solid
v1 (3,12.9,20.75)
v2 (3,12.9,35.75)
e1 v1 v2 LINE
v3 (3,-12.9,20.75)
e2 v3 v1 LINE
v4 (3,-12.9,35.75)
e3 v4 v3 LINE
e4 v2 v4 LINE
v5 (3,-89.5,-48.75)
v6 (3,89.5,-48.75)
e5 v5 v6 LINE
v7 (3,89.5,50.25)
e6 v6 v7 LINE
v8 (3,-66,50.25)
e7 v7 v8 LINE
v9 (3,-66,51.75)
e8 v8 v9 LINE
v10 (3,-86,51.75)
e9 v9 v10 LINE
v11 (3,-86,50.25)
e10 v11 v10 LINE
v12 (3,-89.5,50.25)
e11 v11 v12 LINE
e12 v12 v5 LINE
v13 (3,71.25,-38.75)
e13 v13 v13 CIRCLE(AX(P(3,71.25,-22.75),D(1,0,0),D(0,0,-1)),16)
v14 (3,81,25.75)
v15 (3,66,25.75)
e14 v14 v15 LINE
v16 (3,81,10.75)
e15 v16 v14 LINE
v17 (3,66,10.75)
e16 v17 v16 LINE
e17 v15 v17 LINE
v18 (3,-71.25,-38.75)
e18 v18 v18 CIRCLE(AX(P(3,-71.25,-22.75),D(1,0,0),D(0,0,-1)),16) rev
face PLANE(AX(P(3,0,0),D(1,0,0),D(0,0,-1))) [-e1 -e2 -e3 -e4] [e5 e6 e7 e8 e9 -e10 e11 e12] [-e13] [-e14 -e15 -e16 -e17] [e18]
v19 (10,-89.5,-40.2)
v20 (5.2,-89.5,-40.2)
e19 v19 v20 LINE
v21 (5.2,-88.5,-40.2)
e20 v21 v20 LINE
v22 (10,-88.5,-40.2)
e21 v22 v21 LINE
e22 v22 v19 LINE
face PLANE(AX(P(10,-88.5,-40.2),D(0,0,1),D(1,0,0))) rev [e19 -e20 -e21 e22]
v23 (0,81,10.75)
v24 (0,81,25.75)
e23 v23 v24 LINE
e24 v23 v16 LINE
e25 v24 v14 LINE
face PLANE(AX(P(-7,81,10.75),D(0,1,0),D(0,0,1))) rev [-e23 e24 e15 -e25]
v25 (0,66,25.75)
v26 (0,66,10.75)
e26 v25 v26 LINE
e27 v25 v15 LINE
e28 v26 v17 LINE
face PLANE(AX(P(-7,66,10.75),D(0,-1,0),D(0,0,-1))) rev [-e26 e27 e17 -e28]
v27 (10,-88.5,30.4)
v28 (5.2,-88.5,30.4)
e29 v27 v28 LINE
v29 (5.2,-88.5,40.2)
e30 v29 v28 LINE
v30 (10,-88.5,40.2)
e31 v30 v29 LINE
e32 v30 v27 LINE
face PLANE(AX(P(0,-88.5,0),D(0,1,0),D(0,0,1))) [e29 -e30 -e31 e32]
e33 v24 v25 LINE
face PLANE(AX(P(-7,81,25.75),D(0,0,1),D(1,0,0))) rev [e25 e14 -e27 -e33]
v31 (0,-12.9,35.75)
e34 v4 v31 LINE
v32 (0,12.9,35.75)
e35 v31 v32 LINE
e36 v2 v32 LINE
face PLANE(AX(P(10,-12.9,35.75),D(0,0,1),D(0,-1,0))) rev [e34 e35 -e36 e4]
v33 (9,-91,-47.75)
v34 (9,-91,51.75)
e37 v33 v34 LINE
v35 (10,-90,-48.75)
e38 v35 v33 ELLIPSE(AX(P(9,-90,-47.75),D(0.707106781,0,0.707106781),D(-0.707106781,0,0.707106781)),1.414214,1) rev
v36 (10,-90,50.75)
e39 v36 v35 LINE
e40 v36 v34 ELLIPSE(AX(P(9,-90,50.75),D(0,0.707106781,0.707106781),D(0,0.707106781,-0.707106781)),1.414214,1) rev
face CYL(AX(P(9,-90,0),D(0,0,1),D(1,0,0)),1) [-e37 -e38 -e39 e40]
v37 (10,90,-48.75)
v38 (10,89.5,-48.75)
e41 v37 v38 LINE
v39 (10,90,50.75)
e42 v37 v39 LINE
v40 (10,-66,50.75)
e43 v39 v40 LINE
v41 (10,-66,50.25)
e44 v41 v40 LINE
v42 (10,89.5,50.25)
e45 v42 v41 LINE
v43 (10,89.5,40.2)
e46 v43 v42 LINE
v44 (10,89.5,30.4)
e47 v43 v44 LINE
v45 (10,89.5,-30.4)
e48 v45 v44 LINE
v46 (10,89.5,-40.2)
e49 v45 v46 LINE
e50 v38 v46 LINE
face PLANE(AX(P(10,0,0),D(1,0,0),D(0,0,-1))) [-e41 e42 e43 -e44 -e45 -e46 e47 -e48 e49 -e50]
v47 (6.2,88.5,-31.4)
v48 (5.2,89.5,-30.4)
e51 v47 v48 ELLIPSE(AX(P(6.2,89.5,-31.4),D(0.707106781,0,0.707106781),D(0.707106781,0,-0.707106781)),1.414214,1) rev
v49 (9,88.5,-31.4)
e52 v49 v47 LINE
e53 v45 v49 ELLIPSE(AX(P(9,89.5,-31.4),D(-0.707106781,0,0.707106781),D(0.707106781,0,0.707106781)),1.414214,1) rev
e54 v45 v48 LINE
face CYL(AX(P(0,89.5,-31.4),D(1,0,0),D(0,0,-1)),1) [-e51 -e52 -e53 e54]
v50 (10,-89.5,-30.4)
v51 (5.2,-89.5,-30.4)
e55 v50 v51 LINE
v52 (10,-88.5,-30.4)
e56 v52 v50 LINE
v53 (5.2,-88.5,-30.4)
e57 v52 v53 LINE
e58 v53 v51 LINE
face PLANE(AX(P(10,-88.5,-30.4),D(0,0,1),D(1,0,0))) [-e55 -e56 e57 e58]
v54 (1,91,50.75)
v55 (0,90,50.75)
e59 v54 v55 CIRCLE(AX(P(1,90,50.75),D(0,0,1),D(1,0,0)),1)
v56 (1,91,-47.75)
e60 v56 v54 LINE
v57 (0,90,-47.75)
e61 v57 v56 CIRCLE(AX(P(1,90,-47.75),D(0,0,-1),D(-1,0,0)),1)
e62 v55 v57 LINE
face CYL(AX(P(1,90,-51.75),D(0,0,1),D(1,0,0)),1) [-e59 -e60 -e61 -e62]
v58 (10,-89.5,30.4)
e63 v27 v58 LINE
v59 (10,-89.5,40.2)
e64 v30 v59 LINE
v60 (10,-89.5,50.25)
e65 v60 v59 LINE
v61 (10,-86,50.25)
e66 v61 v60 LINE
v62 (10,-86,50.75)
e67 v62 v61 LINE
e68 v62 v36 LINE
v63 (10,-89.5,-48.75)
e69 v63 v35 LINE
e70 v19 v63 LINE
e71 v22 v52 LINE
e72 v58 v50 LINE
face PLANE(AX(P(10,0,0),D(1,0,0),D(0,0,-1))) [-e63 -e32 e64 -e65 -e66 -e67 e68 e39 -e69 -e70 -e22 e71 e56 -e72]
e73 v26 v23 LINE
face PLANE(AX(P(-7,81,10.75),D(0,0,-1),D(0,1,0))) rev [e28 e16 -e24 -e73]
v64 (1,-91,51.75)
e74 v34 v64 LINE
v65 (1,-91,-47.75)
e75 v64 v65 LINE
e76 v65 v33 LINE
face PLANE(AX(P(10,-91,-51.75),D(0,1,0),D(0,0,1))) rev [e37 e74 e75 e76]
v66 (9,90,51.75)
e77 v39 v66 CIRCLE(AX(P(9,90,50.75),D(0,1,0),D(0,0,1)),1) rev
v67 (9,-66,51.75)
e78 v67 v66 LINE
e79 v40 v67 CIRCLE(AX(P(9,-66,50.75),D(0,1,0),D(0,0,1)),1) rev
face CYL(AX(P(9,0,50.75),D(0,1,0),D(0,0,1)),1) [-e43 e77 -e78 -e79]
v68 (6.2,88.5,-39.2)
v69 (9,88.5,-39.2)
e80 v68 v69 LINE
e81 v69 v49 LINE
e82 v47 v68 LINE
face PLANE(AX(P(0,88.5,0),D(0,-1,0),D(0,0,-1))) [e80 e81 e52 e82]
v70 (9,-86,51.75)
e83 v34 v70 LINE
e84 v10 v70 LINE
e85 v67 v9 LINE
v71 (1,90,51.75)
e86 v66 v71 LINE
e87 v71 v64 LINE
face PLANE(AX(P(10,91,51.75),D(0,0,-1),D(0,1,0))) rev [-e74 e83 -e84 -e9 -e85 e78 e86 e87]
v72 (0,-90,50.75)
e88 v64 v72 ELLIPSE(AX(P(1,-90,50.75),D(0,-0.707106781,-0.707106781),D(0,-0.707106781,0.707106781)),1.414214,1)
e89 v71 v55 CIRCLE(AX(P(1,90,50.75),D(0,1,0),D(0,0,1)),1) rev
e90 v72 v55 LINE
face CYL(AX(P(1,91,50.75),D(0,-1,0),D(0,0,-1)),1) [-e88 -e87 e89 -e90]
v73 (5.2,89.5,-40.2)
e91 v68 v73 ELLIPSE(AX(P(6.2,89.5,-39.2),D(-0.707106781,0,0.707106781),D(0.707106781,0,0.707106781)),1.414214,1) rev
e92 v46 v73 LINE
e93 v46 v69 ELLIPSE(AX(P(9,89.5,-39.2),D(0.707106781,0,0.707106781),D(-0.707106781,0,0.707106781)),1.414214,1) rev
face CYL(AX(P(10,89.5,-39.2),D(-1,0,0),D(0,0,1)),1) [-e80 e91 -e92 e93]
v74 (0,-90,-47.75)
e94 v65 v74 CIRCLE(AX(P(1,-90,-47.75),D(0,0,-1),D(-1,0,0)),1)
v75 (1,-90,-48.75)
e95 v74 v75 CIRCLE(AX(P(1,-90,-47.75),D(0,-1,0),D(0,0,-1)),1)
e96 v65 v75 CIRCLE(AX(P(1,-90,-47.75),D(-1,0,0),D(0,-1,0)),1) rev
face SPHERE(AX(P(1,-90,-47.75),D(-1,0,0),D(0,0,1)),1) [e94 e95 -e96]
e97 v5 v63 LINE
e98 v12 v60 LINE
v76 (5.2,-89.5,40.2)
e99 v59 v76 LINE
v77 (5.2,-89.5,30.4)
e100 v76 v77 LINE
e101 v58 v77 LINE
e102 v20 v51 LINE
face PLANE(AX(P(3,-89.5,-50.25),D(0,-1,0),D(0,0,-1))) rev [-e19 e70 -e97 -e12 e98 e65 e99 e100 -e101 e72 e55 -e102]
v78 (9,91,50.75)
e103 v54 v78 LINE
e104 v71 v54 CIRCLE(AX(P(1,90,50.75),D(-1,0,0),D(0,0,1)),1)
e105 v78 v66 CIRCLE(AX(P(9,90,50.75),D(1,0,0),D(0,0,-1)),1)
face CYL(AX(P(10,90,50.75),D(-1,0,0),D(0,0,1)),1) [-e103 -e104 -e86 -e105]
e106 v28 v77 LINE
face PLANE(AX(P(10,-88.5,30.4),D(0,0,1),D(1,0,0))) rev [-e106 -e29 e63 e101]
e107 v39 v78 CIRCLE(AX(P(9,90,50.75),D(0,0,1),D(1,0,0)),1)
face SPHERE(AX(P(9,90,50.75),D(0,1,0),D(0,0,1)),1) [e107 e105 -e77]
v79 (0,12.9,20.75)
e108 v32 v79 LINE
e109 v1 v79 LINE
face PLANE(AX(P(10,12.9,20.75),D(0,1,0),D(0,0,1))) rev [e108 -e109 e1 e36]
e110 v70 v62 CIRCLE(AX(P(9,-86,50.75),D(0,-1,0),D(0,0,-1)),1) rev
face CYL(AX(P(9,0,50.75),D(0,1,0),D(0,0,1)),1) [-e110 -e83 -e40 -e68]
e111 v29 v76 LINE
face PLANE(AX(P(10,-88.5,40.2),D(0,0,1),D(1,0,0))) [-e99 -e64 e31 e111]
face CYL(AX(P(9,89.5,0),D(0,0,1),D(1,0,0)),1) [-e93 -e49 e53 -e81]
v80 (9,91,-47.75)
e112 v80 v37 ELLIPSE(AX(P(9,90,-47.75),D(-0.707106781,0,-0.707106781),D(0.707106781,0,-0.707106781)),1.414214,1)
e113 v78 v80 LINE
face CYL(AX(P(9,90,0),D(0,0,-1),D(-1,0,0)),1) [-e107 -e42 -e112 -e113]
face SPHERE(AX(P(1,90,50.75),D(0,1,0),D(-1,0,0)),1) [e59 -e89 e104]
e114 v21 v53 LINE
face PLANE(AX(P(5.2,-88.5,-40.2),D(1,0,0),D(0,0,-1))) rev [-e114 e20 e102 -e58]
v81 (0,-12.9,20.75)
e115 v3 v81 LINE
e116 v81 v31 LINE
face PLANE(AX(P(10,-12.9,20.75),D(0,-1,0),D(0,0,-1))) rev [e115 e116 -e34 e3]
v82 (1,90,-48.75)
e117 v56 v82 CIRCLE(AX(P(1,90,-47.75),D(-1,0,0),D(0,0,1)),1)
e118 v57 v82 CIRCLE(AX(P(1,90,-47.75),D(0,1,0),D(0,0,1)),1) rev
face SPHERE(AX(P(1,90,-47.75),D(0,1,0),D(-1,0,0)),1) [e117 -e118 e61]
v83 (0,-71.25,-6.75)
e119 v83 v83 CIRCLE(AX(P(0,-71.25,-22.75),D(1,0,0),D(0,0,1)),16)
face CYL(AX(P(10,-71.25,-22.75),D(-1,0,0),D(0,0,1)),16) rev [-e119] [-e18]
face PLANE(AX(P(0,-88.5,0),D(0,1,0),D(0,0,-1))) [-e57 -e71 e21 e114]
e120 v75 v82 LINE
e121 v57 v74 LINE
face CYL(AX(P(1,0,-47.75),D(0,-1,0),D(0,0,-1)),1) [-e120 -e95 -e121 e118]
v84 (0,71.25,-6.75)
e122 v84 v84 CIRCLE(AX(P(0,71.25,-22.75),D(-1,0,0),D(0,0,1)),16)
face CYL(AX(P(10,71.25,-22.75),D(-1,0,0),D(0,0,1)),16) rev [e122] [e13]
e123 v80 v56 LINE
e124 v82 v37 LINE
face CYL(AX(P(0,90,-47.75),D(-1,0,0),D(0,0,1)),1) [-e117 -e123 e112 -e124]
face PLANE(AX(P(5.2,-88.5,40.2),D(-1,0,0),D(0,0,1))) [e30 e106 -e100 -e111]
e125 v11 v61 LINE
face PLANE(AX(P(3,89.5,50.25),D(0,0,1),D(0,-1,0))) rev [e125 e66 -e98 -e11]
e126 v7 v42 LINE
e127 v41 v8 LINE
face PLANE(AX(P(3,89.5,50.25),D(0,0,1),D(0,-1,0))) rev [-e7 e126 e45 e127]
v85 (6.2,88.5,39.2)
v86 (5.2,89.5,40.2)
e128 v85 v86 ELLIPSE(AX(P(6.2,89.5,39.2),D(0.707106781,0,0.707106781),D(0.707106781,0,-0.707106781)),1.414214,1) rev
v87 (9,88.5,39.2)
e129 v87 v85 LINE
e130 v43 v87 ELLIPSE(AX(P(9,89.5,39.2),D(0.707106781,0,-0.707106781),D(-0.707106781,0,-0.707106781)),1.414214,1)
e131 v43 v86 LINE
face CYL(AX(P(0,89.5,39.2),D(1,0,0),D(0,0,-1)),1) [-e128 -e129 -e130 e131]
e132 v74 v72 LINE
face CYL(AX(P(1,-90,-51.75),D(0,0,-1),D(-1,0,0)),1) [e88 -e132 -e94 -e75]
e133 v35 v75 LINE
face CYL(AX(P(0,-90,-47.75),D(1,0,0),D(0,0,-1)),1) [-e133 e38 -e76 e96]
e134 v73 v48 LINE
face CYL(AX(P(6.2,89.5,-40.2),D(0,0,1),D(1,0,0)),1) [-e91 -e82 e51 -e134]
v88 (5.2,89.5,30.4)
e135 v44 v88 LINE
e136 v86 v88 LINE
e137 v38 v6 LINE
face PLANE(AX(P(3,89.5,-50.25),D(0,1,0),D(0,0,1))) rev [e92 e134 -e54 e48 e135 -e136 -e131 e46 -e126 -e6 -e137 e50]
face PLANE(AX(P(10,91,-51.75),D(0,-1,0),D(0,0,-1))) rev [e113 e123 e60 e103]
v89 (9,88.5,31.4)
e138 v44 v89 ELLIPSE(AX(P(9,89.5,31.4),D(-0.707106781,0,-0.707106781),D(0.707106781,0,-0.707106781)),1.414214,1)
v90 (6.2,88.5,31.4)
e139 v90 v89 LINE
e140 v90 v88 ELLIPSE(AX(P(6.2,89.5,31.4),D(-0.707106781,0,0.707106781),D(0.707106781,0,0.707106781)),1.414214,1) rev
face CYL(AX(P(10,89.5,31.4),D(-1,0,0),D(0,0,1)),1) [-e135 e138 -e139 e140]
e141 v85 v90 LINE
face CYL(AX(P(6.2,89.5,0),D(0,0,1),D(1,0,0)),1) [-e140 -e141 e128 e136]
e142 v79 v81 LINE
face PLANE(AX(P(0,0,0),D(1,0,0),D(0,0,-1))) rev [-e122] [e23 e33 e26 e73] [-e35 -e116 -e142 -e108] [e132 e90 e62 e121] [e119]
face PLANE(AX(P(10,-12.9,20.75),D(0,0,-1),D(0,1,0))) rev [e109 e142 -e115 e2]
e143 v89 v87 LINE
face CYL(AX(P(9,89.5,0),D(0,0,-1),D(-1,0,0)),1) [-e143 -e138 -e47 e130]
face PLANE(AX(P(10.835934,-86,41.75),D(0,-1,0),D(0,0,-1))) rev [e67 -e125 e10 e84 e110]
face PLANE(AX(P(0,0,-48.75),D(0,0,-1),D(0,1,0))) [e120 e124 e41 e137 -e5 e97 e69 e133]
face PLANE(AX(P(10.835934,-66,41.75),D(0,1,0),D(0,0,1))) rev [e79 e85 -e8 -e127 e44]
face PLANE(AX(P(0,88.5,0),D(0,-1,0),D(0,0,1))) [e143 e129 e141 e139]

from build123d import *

# Parameters (mm, degrees)
ESBO_O1_W                 = 182
ESBO_O1_H                 = 103.5
RESSALTO_EXTRUS_O1_DEPTH  = 10
ESBO_O2_W                 = 179
ESBO_O2_H                 = 100.5
CORTE_EXTRUS_O1_DEPTH     = 7
ESBO_O4_W                 = 4.8
ESBO_O4_H                 = 9.8
RESSALTO_EXTRUS_O2_DEPTH  = 1
ESPELHAR2_COPY_1_SKETCH_W = 4.8
ESPELHAR2_COPY_1_SKETCH_H = 9.8
ESPELHAR2_COPY_1_DEPTH    = 1
ESBO_O5_W                 = 10
ESBO_O5_H                 = 182
CORTE_EXTRUS_O2_DEPTH     = 3
FILETE3_R                 = 1
FILETE8_R                 = 1
ESBO_O6_R                 = 16
CORTE_EXTRUS_O3_DEPTH     = 10
ESBO_O7_W                 = 25.8
ESBO_O7_H                 = 15
CORTE_EXTRUS_O4_DEPTH     = 10
ESBO_O9_W                 = 15
ESBO_O9_H                 = 15
CORTE_EXTRUS_O5_DEPTH     = 10
ESBO_O10_W                = 7.835934364
ESBO_O10_H                = 20
CORTE_EXTRUS_O6_DEPTH     = 10


with BuildPart() as part:
    # Esboço1 → Ressalto-extrusão1 (new body)
    with BuildSketch(Plane.YZ):
        Rectangle(ESBO_O1_W, ESBO_O1_H)
    extrude(amount=RESSALTO_EXTRUS_O1_DEPTH)

    # Esboço2 → Corte-extrusão1 (cut)
    with BuildSketch(Plane.YZ.offset(10)):
        Rectangle(ESBO_O2_W, ESBO_O2_H)
    extrude(amount=-CORTE_EXTRUS_O1_DEPTH, mode=Mode.SUBTRACT)

    # Esboço4 → Ressalto-extrusão2 (add)
    with BuildSketch(Plane(origin=(0, -89.5, 0), x_dir=(-1, 0, 0), z_dir=(0, 1, 0))):
        with Locations((-7.6, 35.3)):
            Rectangle(ESBO_O4_W, ESBO_O4_H)
    ressalto_extrus_o2 = extrude(amount=RESSALTO_EXTRUS_O2_DEPTH)

    # Espelhar1: Ressalto-extrusão2 across plane
    add(ressalto_extrus_o2.mirror(Plane.XY))

    # Espelhar2: Ressalto-extrusão2 across plane
    add(ressalto_extrus_o2.mirror(Plane.ZX))

    # Espelhar2 copy 1 sketch → Espelhar2 copy 1 (add)
    with BuildSketch(Plane(origin=(0, 89.5, 0), x_dir=(-1, 0, 0), z_dir=(0, -1, 0))):
        with Locations((-7.6, 35.3)):
            Rectangle(ESPELHAR2_COPY_1_SKETCH_W, ESPELHAR2_COPY_1_SKETCH_H)
    extrude(amount=ESPELHAR2_COPY_1_DEPTH)

    # Esboço5 → Corte-extrusão2 (cut)
    with BuildSketch(Plane(origin=(0, 0, -51.75), x_dir=(1, 0, 0), z_dir=(0, 0, -1))):
        with Locations((5, 0)):
            Rectangle(ESBO_O5_W, ESBO_O5_H)
    extrude(amount=-CORTE_EXTRUS_O2_DEPTH, mode=Mode.SUBTRACT)

    # Filete3
    filete3_edges = [part.edges().sort_by_distance(p)[0] for p in [
        (10, 0, 51.75),
        (10, -91, 1.5),
        (0, 0, 51.75),
        (0, -91, 1.5),
        (5, 91, 51.75),
        (0, 91, 1.5),
        (10, 91, 1.5),
        (0, 0, -48.75),
        (5, -91, -48.75),
        (5, 91, -48.75),
    ]]
    fillet(filete3_edges, radius=FILETE3_R)

    # Filete8
    filete8_edges = [part.edges().sort_by_distance(p)[0] for p in [
        (7.6, 88.5, -40.2),
        (5.2, 88.5, -35.3),
        (7.6, 88.5, -30.4),
        (10, 88.5, -35.3),
        (7.6, 88.5, 30.4),
        (5.2, 88.5, 35.3),
        (7.6, 88.5, 40.2),
        (10, 88.5, 35.3),
    ]]
    fillet(filete8_edges, radius=FILETE8_R - 0.0001)  # a hair under: the kernel refuses the full size

    # Esboço6 → Corte-extrusão3 (cut)
    with BuildSketch(Plane(origin=(0, 0, 0), x_dir=(0, -1, 0), z_dir=(-1, 0, 0))):
        with Locations(Location((-71.25, -22.75, 0), (0, 0, 90))):
            Circle(ESBO_O6_R)
    corte_extrus_o3 = extrude(amount=-CORTE_EXTRUS_O3_DEPTH, mode=Mode.SUBTRACT)

    # Espelhar3: Corte-extrusão3 across plane
    add(corte_extrus_o3.mirror(Plane.ZX), mode=Mode.SUBTRACT)

    # Esboço7 → Corte-extrusão4 (cut)
    with BuildSketch(Plane(origin=(0, 0, 0), x_dir=(0, -1, 0), z_dir=(-1, 0, 0))):
        with Locations((0, 28.25)):
            Rectangle(ESBO_O7_W, ESBO_O7_H)
    extrude(amount=-CORTE_EXTRUS_O4_DEPTH, mode=Mode.SUBTRACT)

    # Esboço9 → Corte-extrusão5 (cut)
    with BuildSketch(Plane.YZ.offset(3)):
        with Locations((73.5, 18.25)):
            Rectangle(ESBO_O9_W, ESBO_O9_H)
    extrude(amount=-CORTE_EXTRUS_O5_DEPTH, mode=Mode.SUBTRACT)

    # Esboço10 → Corte-extrusão6 (cut)
    with BuildSketch(Plane.XY.offset(51.75)):
        with Locations((6.917967182, -76)):
            Rectangle(ESBO_O10_W, ESBO_O10_H)
    extrude(amount=-CORTE_EXTRUS_O6_DEPTH, mode=Mode.SUBTRACT)


solid = part.part
